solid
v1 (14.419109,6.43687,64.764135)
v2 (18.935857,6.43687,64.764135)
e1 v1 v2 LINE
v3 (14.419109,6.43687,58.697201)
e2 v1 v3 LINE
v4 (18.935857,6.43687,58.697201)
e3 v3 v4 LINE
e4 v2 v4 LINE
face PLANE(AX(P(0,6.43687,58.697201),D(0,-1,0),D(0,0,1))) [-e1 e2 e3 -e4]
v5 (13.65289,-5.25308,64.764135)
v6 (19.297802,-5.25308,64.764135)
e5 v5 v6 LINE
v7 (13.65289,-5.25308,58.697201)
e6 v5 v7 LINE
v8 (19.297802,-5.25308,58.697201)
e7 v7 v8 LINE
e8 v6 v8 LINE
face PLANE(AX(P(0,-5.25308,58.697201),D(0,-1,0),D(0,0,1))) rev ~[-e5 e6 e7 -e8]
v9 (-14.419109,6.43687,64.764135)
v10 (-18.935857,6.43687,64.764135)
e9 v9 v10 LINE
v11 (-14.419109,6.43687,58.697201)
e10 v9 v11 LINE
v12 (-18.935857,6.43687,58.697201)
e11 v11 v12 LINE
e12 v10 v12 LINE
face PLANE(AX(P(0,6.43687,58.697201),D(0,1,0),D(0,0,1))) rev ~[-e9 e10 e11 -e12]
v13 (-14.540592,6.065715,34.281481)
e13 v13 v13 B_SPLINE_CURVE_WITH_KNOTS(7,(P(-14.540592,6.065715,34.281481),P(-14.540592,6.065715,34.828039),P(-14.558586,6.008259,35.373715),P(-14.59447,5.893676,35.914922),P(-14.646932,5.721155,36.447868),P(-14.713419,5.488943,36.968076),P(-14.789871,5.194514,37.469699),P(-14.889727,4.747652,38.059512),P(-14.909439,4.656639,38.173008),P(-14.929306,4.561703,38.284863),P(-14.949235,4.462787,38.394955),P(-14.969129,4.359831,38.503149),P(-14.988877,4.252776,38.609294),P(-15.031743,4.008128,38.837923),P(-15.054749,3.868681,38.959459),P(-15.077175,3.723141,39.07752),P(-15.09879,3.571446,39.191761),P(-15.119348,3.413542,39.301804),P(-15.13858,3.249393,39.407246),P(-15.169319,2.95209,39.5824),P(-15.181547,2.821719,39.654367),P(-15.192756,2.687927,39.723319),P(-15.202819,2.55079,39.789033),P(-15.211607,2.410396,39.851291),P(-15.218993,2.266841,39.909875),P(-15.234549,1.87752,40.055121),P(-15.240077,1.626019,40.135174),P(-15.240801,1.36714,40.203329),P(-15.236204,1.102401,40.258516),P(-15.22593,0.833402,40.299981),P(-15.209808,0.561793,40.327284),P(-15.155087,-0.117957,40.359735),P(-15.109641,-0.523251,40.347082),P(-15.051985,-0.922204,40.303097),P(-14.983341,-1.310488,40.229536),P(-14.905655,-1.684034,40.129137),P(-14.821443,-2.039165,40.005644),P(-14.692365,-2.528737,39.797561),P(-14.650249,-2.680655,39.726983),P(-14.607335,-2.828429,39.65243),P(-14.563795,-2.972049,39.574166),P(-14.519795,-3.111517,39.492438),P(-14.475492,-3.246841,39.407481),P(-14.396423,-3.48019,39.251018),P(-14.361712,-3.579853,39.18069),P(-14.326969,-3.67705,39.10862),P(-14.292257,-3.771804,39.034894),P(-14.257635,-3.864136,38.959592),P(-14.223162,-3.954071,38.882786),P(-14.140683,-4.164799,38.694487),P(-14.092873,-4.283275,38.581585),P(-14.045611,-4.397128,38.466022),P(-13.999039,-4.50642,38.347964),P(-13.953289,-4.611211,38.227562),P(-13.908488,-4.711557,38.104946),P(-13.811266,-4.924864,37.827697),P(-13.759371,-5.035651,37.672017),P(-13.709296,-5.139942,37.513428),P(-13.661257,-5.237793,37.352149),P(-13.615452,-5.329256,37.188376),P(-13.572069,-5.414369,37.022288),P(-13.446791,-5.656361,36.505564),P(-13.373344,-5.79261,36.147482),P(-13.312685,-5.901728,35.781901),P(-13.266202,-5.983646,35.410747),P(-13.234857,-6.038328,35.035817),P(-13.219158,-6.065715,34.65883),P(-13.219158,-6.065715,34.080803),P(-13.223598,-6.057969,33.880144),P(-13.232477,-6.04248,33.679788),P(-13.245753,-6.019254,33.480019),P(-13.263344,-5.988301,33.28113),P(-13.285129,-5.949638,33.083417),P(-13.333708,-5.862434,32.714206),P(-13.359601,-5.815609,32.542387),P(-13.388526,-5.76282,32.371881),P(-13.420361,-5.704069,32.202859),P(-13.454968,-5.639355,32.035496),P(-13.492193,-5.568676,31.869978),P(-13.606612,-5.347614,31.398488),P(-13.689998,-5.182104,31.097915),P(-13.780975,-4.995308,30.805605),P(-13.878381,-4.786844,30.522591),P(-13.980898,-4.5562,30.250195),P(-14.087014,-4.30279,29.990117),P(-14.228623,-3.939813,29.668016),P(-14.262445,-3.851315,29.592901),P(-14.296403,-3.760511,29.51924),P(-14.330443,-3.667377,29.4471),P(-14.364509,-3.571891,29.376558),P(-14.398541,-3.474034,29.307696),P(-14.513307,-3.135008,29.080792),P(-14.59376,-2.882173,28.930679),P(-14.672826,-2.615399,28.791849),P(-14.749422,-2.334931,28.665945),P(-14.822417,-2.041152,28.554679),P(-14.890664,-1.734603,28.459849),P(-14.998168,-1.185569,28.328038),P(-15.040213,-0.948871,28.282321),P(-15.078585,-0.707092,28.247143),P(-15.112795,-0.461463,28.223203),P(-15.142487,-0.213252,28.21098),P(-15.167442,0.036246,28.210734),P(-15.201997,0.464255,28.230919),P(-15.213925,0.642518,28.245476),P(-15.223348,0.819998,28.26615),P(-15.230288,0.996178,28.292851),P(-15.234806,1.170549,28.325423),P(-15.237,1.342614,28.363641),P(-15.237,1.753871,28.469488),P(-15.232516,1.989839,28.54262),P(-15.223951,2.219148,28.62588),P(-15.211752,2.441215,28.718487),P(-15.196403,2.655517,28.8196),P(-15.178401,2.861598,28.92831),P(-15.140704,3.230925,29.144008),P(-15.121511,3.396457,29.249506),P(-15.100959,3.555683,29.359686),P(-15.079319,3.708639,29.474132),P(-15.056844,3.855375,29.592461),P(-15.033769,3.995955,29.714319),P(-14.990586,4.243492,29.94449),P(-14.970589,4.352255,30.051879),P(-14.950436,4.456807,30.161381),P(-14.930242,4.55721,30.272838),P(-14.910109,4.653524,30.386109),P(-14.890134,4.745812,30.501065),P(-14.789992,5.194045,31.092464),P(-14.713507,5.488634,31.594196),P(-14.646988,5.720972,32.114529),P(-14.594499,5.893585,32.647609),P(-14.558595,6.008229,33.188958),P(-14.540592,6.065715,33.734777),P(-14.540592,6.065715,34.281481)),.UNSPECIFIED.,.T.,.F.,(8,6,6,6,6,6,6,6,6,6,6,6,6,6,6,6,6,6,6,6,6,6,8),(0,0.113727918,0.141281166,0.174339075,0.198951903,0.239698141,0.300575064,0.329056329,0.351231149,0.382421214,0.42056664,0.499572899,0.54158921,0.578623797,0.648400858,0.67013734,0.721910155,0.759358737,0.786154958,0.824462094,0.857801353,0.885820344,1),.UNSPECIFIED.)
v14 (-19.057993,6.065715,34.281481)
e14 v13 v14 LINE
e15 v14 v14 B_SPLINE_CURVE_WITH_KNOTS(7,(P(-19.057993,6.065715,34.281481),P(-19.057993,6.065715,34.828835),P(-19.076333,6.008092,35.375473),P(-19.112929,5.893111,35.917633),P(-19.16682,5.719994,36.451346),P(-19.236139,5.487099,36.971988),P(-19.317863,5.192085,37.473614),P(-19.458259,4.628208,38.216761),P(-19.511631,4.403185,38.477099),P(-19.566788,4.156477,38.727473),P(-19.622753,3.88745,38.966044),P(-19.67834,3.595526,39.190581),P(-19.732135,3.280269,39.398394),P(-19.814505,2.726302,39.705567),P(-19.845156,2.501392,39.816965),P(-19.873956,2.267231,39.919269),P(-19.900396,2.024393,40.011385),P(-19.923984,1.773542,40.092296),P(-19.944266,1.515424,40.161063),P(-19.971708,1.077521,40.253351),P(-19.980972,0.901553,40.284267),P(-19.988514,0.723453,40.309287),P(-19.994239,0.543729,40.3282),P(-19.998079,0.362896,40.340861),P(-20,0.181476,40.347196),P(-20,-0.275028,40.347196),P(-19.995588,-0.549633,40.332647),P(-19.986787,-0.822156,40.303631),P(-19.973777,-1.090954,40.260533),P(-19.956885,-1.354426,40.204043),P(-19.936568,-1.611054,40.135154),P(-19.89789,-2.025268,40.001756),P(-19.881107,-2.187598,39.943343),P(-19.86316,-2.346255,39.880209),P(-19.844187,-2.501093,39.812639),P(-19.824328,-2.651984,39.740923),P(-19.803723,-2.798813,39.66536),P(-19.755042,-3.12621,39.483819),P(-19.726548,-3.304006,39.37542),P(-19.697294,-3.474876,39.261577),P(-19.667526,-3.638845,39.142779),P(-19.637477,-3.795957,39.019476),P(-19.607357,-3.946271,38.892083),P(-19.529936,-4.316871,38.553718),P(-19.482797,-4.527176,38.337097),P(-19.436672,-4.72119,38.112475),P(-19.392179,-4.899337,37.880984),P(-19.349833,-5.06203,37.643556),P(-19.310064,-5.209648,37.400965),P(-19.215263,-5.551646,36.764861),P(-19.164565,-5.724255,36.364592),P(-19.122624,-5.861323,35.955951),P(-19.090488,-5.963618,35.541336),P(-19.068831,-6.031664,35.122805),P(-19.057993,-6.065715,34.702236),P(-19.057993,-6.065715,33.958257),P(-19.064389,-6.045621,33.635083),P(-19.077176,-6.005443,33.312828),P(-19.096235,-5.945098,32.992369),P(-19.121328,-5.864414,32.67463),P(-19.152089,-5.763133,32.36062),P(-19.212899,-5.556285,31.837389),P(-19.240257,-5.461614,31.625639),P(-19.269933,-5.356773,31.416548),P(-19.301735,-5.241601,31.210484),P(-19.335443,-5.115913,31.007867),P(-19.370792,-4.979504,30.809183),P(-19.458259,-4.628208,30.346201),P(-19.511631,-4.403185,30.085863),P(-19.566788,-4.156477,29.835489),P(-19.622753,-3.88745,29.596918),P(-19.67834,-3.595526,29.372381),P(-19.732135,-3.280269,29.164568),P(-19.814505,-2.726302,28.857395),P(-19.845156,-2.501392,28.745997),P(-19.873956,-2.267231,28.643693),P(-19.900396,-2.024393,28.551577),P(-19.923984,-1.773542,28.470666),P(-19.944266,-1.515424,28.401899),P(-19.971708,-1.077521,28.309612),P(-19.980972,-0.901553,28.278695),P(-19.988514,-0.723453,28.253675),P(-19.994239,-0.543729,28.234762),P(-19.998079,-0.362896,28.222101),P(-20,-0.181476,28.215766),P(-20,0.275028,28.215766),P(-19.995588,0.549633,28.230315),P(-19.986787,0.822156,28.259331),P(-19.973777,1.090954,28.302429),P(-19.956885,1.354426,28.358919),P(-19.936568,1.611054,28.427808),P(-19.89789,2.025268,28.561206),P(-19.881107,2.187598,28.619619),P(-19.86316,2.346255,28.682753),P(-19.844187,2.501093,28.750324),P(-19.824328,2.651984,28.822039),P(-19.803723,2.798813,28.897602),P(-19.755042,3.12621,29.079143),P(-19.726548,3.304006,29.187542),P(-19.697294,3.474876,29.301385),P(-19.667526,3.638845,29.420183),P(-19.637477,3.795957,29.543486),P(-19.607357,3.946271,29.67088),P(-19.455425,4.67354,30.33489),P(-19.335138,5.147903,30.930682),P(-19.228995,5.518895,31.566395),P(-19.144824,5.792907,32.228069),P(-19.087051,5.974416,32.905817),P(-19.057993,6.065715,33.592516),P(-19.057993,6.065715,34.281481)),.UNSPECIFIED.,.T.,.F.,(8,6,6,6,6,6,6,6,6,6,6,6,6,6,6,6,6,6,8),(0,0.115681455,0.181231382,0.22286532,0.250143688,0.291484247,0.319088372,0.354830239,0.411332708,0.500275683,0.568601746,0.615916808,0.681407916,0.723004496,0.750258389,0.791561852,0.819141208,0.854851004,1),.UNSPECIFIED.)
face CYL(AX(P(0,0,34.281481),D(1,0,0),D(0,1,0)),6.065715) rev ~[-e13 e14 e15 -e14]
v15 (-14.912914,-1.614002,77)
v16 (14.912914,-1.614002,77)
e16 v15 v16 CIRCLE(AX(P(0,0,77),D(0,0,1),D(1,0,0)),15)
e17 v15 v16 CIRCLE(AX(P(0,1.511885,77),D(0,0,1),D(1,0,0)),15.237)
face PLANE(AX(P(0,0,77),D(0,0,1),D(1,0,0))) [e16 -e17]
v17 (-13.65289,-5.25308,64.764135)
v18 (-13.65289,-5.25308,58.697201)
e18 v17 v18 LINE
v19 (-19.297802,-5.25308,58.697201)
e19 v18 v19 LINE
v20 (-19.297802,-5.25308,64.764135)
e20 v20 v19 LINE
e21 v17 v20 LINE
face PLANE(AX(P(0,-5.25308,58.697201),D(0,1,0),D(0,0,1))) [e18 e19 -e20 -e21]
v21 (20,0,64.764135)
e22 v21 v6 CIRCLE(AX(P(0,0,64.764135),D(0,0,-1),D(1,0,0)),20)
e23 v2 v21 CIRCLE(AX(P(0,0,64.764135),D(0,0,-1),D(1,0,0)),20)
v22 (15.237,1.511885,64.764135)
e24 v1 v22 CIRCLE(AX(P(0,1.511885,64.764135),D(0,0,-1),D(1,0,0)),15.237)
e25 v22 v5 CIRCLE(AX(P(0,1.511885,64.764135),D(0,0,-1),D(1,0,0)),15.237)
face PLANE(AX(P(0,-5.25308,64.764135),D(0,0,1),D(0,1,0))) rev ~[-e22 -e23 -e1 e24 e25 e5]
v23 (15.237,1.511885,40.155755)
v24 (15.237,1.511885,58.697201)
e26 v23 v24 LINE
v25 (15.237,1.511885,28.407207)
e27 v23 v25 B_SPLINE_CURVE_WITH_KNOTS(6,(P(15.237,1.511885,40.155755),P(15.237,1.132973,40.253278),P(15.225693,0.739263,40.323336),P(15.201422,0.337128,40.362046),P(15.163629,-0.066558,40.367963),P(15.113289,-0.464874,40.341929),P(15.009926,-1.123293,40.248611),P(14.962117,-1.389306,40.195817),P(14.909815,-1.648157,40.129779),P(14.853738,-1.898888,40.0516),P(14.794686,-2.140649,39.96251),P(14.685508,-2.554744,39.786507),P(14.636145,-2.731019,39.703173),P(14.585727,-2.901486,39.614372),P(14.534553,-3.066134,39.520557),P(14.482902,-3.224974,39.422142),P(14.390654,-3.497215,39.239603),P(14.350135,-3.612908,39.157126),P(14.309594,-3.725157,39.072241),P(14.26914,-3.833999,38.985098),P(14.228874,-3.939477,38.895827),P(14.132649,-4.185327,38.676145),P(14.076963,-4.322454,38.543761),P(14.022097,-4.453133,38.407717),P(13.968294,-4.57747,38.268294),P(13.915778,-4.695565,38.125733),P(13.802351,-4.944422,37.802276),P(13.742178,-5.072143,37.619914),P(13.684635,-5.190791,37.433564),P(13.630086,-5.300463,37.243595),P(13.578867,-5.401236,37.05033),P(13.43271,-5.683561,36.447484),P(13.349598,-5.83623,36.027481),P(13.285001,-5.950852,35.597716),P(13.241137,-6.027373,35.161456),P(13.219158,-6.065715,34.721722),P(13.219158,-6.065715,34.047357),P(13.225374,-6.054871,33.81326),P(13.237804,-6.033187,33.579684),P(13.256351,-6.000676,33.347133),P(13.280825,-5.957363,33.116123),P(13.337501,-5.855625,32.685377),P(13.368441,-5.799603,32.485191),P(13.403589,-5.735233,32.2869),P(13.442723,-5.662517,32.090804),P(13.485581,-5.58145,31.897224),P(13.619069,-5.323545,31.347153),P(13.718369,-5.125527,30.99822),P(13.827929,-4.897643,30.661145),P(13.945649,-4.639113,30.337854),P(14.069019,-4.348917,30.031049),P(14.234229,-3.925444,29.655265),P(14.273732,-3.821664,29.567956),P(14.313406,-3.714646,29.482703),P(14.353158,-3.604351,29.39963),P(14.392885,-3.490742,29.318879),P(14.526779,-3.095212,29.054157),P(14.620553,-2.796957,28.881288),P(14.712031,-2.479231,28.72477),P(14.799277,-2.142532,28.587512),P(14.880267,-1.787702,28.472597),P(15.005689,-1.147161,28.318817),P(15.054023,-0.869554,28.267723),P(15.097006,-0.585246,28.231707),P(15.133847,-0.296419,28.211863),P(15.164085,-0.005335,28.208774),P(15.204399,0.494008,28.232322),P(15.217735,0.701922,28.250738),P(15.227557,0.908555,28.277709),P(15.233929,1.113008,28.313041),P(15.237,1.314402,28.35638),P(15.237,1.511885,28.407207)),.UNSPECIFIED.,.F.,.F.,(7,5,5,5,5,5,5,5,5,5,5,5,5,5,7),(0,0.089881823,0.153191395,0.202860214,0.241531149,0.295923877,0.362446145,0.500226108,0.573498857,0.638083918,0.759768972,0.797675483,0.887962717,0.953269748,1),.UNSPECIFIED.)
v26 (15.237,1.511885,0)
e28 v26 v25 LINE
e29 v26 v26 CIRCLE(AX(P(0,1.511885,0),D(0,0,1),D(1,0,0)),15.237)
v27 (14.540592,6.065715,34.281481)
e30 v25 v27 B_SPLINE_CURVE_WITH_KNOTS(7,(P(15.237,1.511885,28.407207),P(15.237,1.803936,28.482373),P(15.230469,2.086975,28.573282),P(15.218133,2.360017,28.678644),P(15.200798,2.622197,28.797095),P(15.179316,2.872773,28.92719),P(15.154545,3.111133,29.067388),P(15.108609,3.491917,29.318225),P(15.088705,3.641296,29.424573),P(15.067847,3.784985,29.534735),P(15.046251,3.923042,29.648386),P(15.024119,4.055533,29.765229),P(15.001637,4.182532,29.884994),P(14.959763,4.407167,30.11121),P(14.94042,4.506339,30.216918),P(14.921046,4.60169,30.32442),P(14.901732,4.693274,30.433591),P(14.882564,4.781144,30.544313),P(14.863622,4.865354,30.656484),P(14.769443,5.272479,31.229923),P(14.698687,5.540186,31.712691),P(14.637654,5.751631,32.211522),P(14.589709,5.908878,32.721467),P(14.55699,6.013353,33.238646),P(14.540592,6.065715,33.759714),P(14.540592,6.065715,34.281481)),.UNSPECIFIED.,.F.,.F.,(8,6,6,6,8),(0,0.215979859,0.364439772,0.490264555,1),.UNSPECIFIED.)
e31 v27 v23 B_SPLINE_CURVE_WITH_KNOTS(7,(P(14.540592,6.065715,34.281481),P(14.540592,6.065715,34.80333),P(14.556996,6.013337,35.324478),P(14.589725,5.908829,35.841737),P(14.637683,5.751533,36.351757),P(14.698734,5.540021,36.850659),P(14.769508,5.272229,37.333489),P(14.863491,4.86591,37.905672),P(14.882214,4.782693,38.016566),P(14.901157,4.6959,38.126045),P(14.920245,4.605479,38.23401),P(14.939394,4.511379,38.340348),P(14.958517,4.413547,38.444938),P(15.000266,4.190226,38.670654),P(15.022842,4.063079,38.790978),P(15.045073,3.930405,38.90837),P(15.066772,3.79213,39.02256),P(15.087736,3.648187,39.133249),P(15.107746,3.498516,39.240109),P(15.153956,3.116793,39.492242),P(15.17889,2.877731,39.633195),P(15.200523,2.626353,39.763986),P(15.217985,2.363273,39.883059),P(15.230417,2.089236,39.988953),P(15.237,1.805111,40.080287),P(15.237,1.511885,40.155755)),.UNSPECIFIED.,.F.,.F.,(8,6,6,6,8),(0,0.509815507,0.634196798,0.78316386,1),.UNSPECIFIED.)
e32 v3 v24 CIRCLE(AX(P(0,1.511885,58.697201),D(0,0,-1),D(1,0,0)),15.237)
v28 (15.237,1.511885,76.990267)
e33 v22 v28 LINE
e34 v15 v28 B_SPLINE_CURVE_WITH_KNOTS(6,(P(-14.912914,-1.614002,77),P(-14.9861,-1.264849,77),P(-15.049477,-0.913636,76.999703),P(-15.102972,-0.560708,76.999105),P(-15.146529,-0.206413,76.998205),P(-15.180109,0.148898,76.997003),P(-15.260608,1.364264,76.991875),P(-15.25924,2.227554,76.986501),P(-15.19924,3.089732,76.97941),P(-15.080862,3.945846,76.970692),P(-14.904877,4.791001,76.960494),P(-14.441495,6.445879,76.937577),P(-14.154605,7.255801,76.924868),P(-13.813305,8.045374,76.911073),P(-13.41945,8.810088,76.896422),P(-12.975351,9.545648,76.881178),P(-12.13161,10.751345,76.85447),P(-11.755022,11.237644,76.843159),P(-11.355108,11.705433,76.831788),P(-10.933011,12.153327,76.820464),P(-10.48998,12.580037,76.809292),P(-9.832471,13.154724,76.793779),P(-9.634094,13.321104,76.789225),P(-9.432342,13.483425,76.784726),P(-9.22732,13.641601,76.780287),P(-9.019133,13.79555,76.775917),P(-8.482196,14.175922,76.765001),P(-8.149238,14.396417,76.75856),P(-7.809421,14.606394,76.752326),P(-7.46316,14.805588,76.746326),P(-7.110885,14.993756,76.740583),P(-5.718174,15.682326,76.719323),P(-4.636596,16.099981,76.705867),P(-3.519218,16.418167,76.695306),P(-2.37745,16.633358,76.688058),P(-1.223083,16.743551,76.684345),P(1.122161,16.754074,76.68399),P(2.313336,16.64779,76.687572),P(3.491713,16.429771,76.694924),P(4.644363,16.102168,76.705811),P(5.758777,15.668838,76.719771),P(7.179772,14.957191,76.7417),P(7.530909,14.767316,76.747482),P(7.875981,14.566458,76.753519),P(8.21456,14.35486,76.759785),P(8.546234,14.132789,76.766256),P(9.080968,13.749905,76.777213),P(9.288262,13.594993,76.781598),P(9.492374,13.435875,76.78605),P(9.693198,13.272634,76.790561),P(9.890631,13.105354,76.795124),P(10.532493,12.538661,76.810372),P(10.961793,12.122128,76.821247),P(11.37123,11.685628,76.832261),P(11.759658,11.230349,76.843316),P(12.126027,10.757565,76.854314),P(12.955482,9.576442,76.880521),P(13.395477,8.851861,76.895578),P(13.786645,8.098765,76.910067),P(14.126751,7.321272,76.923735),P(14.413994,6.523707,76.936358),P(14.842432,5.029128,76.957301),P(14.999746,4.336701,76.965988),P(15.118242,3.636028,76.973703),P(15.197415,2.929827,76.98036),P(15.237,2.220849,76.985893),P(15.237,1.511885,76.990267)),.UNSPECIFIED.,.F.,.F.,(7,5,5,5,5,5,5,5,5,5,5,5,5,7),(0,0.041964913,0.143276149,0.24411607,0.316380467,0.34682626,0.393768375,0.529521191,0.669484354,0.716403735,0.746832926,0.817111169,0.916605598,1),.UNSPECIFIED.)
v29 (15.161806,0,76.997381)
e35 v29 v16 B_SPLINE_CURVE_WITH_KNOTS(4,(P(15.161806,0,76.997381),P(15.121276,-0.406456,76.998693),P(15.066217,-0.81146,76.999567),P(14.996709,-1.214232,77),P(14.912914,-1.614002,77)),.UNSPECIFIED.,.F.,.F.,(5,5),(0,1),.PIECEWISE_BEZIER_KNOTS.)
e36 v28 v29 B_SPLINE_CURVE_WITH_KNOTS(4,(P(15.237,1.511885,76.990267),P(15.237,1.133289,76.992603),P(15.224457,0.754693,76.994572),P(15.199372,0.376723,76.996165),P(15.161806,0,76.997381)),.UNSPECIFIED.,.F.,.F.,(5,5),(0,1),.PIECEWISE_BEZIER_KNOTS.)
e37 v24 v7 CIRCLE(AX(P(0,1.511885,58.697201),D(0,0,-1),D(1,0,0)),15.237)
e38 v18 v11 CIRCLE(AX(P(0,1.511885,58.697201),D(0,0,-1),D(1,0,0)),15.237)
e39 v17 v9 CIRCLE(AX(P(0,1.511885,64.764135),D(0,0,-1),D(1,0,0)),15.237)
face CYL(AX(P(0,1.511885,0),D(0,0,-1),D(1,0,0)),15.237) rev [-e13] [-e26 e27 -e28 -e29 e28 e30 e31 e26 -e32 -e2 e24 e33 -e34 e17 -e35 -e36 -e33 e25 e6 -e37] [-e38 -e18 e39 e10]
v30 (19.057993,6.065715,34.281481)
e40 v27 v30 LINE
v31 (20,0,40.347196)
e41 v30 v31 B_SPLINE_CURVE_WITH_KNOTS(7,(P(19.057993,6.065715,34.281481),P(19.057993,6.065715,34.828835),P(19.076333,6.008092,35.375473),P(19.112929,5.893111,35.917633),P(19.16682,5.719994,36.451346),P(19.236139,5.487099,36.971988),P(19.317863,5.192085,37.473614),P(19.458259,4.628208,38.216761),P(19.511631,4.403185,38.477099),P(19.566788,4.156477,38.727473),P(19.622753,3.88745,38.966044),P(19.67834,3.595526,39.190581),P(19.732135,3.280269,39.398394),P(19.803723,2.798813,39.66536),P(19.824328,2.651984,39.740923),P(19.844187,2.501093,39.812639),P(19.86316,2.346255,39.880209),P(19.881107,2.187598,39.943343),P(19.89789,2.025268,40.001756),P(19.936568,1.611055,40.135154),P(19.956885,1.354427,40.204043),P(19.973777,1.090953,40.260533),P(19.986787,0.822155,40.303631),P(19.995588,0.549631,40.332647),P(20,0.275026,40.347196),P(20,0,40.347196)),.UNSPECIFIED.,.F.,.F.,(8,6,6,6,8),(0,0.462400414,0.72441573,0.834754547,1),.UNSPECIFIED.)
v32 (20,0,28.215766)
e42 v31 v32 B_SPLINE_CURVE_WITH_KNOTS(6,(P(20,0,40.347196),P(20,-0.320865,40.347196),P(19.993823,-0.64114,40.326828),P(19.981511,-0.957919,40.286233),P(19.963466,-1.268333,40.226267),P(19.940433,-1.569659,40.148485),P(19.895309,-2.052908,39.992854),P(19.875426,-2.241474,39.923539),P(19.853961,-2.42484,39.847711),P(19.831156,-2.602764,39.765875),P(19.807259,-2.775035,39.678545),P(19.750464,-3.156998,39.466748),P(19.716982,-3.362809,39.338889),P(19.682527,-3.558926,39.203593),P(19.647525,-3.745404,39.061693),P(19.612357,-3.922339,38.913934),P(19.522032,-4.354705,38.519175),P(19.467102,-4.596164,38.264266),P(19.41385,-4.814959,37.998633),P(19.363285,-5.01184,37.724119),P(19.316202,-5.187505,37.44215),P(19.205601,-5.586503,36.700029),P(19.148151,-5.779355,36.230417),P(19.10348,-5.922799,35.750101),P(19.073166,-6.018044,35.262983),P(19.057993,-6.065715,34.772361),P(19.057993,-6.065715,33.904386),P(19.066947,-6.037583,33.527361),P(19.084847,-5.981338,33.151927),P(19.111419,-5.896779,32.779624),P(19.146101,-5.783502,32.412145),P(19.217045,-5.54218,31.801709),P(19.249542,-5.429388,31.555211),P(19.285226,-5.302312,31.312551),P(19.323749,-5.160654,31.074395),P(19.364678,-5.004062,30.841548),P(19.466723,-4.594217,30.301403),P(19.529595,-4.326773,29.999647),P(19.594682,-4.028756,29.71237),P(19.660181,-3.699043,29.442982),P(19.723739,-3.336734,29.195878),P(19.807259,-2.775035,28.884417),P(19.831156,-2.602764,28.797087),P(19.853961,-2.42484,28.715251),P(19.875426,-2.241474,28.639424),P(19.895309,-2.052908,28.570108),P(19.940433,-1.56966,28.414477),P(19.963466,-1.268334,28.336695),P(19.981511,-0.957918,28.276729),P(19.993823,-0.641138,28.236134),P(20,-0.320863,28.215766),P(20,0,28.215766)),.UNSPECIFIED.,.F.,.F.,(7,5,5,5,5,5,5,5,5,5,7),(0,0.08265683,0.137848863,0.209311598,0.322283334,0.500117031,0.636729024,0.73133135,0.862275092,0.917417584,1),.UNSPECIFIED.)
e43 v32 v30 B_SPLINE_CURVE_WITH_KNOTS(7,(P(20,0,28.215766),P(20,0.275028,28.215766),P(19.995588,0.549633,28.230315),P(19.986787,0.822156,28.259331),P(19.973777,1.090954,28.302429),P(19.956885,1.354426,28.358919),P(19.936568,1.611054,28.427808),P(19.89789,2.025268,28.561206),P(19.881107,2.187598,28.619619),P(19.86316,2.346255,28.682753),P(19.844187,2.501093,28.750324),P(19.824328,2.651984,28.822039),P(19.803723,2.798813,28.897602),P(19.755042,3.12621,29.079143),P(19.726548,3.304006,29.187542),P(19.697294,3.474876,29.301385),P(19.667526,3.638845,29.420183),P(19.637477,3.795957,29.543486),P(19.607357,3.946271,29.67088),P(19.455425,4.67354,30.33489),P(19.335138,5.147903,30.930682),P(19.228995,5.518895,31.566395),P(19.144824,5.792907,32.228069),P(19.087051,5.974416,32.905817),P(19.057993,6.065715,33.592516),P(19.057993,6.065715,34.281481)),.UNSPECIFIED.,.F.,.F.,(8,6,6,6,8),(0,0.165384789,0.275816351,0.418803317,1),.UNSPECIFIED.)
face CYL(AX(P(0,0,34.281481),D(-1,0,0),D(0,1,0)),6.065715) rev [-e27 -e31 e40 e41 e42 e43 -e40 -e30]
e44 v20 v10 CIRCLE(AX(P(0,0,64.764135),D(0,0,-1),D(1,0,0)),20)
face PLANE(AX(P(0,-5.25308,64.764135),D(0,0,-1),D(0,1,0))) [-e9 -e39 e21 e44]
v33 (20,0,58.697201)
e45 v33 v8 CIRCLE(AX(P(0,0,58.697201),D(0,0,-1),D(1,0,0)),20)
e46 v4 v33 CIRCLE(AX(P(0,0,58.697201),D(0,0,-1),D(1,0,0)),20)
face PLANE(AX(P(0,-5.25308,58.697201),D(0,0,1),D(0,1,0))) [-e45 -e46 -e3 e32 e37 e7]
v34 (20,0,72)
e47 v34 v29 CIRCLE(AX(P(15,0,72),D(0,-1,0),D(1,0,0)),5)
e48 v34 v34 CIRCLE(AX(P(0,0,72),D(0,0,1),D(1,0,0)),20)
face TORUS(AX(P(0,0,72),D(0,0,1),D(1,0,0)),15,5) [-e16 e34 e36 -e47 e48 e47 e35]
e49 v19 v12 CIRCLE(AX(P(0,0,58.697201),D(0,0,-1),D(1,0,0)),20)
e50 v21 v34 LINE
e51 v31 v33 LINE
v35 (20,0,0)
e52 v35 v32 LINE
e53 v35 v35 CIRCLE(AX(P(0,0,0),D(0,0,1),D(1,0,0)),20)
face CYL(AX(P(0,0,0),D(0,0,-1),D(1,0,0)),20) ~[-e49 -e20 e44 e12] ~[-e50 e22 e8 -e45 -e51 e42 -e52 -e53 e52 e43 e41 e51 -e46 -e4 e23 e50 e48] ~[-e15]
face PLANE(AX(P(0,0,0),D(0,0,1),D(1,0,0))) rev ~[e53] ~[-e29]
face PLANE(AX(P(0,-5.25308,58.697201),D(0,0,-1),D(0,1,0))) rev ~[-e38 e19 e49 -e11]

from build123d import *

# Parameters (mm, degrees)
F0_R          = 20
F0_R_2        = 15.237
F1_DEPTH      = 77
F3_R          = 6.065714741
F4_DEPTH      = 25
F4_DEPTH_BACK = 25
F3_W          = 11.689950712
F3_H          = 6.0669332743
F5_DEPTH      = 25
F5_DEPTH_BACK = 25


# Not quite as in the source:
# - a fillet or chamfer that OpenCascade refuses, or shapes differently, is made with other operations: its cross-section is extruded or revolved along the edge and cut away or added


with BuildPart() as f1:
    # F0 (on Top) → F1 (new body)
    with BuildSketch(Plane.XY):
        Circle(F0_R)
        with Locations((0, 1.5118854353)):
            Circle(F0_R_2, mode=Mode.SUBTRACT)
    extrude(amount=F1_DEPTH)

    # F2: fillet of radius 5 on 1 edges, made by hand

    # F2_s1 → F2_t2 (revolve, cut)
    with BuildSketch(Plane.XZ):
        with BuildLine():
            ThreePointArc((20, 72), (18.5355339059, 75.5355339059), (15, 77))
            Line((15, 77), (20, 77))
            Line((20, 77), (20, 72))
        make_face()
    revolve(axis=Axis((0, 0, 77), (0, 0, 1)), mode=Mode.SUBTRACT)

    # F3 (on Right) → F4 (join, two sides)
    with BuildSketch(Plane.YZ) as f4_sk:
        with Locations((0, 34.2814810574)):
            Circle(F3_R)
    extrude(amount=F4_DEPTH)
    extrude(f4_sk.sketch, amount=-F4_DEPTH_BACK)

    # F3 (on Right) → F5 (cut, two sides)
    with BuildSketch(Plane.YZ) as f5_sk:
        with Locations((0, 34.2814810574)):
            Circle(F3_R)
        with Locations((0.5918950774, 61.7306679487)):
            Rectangle(F3_W, F3_H)
    extrude(amount=-F5_DEPTH, mode=Mode.SUBTRACT)
    extrude(f5_sk.sketch, amount=F5_DEPTH_BACK, mode=Mode.SUBTRACT)


solid = f1.part
